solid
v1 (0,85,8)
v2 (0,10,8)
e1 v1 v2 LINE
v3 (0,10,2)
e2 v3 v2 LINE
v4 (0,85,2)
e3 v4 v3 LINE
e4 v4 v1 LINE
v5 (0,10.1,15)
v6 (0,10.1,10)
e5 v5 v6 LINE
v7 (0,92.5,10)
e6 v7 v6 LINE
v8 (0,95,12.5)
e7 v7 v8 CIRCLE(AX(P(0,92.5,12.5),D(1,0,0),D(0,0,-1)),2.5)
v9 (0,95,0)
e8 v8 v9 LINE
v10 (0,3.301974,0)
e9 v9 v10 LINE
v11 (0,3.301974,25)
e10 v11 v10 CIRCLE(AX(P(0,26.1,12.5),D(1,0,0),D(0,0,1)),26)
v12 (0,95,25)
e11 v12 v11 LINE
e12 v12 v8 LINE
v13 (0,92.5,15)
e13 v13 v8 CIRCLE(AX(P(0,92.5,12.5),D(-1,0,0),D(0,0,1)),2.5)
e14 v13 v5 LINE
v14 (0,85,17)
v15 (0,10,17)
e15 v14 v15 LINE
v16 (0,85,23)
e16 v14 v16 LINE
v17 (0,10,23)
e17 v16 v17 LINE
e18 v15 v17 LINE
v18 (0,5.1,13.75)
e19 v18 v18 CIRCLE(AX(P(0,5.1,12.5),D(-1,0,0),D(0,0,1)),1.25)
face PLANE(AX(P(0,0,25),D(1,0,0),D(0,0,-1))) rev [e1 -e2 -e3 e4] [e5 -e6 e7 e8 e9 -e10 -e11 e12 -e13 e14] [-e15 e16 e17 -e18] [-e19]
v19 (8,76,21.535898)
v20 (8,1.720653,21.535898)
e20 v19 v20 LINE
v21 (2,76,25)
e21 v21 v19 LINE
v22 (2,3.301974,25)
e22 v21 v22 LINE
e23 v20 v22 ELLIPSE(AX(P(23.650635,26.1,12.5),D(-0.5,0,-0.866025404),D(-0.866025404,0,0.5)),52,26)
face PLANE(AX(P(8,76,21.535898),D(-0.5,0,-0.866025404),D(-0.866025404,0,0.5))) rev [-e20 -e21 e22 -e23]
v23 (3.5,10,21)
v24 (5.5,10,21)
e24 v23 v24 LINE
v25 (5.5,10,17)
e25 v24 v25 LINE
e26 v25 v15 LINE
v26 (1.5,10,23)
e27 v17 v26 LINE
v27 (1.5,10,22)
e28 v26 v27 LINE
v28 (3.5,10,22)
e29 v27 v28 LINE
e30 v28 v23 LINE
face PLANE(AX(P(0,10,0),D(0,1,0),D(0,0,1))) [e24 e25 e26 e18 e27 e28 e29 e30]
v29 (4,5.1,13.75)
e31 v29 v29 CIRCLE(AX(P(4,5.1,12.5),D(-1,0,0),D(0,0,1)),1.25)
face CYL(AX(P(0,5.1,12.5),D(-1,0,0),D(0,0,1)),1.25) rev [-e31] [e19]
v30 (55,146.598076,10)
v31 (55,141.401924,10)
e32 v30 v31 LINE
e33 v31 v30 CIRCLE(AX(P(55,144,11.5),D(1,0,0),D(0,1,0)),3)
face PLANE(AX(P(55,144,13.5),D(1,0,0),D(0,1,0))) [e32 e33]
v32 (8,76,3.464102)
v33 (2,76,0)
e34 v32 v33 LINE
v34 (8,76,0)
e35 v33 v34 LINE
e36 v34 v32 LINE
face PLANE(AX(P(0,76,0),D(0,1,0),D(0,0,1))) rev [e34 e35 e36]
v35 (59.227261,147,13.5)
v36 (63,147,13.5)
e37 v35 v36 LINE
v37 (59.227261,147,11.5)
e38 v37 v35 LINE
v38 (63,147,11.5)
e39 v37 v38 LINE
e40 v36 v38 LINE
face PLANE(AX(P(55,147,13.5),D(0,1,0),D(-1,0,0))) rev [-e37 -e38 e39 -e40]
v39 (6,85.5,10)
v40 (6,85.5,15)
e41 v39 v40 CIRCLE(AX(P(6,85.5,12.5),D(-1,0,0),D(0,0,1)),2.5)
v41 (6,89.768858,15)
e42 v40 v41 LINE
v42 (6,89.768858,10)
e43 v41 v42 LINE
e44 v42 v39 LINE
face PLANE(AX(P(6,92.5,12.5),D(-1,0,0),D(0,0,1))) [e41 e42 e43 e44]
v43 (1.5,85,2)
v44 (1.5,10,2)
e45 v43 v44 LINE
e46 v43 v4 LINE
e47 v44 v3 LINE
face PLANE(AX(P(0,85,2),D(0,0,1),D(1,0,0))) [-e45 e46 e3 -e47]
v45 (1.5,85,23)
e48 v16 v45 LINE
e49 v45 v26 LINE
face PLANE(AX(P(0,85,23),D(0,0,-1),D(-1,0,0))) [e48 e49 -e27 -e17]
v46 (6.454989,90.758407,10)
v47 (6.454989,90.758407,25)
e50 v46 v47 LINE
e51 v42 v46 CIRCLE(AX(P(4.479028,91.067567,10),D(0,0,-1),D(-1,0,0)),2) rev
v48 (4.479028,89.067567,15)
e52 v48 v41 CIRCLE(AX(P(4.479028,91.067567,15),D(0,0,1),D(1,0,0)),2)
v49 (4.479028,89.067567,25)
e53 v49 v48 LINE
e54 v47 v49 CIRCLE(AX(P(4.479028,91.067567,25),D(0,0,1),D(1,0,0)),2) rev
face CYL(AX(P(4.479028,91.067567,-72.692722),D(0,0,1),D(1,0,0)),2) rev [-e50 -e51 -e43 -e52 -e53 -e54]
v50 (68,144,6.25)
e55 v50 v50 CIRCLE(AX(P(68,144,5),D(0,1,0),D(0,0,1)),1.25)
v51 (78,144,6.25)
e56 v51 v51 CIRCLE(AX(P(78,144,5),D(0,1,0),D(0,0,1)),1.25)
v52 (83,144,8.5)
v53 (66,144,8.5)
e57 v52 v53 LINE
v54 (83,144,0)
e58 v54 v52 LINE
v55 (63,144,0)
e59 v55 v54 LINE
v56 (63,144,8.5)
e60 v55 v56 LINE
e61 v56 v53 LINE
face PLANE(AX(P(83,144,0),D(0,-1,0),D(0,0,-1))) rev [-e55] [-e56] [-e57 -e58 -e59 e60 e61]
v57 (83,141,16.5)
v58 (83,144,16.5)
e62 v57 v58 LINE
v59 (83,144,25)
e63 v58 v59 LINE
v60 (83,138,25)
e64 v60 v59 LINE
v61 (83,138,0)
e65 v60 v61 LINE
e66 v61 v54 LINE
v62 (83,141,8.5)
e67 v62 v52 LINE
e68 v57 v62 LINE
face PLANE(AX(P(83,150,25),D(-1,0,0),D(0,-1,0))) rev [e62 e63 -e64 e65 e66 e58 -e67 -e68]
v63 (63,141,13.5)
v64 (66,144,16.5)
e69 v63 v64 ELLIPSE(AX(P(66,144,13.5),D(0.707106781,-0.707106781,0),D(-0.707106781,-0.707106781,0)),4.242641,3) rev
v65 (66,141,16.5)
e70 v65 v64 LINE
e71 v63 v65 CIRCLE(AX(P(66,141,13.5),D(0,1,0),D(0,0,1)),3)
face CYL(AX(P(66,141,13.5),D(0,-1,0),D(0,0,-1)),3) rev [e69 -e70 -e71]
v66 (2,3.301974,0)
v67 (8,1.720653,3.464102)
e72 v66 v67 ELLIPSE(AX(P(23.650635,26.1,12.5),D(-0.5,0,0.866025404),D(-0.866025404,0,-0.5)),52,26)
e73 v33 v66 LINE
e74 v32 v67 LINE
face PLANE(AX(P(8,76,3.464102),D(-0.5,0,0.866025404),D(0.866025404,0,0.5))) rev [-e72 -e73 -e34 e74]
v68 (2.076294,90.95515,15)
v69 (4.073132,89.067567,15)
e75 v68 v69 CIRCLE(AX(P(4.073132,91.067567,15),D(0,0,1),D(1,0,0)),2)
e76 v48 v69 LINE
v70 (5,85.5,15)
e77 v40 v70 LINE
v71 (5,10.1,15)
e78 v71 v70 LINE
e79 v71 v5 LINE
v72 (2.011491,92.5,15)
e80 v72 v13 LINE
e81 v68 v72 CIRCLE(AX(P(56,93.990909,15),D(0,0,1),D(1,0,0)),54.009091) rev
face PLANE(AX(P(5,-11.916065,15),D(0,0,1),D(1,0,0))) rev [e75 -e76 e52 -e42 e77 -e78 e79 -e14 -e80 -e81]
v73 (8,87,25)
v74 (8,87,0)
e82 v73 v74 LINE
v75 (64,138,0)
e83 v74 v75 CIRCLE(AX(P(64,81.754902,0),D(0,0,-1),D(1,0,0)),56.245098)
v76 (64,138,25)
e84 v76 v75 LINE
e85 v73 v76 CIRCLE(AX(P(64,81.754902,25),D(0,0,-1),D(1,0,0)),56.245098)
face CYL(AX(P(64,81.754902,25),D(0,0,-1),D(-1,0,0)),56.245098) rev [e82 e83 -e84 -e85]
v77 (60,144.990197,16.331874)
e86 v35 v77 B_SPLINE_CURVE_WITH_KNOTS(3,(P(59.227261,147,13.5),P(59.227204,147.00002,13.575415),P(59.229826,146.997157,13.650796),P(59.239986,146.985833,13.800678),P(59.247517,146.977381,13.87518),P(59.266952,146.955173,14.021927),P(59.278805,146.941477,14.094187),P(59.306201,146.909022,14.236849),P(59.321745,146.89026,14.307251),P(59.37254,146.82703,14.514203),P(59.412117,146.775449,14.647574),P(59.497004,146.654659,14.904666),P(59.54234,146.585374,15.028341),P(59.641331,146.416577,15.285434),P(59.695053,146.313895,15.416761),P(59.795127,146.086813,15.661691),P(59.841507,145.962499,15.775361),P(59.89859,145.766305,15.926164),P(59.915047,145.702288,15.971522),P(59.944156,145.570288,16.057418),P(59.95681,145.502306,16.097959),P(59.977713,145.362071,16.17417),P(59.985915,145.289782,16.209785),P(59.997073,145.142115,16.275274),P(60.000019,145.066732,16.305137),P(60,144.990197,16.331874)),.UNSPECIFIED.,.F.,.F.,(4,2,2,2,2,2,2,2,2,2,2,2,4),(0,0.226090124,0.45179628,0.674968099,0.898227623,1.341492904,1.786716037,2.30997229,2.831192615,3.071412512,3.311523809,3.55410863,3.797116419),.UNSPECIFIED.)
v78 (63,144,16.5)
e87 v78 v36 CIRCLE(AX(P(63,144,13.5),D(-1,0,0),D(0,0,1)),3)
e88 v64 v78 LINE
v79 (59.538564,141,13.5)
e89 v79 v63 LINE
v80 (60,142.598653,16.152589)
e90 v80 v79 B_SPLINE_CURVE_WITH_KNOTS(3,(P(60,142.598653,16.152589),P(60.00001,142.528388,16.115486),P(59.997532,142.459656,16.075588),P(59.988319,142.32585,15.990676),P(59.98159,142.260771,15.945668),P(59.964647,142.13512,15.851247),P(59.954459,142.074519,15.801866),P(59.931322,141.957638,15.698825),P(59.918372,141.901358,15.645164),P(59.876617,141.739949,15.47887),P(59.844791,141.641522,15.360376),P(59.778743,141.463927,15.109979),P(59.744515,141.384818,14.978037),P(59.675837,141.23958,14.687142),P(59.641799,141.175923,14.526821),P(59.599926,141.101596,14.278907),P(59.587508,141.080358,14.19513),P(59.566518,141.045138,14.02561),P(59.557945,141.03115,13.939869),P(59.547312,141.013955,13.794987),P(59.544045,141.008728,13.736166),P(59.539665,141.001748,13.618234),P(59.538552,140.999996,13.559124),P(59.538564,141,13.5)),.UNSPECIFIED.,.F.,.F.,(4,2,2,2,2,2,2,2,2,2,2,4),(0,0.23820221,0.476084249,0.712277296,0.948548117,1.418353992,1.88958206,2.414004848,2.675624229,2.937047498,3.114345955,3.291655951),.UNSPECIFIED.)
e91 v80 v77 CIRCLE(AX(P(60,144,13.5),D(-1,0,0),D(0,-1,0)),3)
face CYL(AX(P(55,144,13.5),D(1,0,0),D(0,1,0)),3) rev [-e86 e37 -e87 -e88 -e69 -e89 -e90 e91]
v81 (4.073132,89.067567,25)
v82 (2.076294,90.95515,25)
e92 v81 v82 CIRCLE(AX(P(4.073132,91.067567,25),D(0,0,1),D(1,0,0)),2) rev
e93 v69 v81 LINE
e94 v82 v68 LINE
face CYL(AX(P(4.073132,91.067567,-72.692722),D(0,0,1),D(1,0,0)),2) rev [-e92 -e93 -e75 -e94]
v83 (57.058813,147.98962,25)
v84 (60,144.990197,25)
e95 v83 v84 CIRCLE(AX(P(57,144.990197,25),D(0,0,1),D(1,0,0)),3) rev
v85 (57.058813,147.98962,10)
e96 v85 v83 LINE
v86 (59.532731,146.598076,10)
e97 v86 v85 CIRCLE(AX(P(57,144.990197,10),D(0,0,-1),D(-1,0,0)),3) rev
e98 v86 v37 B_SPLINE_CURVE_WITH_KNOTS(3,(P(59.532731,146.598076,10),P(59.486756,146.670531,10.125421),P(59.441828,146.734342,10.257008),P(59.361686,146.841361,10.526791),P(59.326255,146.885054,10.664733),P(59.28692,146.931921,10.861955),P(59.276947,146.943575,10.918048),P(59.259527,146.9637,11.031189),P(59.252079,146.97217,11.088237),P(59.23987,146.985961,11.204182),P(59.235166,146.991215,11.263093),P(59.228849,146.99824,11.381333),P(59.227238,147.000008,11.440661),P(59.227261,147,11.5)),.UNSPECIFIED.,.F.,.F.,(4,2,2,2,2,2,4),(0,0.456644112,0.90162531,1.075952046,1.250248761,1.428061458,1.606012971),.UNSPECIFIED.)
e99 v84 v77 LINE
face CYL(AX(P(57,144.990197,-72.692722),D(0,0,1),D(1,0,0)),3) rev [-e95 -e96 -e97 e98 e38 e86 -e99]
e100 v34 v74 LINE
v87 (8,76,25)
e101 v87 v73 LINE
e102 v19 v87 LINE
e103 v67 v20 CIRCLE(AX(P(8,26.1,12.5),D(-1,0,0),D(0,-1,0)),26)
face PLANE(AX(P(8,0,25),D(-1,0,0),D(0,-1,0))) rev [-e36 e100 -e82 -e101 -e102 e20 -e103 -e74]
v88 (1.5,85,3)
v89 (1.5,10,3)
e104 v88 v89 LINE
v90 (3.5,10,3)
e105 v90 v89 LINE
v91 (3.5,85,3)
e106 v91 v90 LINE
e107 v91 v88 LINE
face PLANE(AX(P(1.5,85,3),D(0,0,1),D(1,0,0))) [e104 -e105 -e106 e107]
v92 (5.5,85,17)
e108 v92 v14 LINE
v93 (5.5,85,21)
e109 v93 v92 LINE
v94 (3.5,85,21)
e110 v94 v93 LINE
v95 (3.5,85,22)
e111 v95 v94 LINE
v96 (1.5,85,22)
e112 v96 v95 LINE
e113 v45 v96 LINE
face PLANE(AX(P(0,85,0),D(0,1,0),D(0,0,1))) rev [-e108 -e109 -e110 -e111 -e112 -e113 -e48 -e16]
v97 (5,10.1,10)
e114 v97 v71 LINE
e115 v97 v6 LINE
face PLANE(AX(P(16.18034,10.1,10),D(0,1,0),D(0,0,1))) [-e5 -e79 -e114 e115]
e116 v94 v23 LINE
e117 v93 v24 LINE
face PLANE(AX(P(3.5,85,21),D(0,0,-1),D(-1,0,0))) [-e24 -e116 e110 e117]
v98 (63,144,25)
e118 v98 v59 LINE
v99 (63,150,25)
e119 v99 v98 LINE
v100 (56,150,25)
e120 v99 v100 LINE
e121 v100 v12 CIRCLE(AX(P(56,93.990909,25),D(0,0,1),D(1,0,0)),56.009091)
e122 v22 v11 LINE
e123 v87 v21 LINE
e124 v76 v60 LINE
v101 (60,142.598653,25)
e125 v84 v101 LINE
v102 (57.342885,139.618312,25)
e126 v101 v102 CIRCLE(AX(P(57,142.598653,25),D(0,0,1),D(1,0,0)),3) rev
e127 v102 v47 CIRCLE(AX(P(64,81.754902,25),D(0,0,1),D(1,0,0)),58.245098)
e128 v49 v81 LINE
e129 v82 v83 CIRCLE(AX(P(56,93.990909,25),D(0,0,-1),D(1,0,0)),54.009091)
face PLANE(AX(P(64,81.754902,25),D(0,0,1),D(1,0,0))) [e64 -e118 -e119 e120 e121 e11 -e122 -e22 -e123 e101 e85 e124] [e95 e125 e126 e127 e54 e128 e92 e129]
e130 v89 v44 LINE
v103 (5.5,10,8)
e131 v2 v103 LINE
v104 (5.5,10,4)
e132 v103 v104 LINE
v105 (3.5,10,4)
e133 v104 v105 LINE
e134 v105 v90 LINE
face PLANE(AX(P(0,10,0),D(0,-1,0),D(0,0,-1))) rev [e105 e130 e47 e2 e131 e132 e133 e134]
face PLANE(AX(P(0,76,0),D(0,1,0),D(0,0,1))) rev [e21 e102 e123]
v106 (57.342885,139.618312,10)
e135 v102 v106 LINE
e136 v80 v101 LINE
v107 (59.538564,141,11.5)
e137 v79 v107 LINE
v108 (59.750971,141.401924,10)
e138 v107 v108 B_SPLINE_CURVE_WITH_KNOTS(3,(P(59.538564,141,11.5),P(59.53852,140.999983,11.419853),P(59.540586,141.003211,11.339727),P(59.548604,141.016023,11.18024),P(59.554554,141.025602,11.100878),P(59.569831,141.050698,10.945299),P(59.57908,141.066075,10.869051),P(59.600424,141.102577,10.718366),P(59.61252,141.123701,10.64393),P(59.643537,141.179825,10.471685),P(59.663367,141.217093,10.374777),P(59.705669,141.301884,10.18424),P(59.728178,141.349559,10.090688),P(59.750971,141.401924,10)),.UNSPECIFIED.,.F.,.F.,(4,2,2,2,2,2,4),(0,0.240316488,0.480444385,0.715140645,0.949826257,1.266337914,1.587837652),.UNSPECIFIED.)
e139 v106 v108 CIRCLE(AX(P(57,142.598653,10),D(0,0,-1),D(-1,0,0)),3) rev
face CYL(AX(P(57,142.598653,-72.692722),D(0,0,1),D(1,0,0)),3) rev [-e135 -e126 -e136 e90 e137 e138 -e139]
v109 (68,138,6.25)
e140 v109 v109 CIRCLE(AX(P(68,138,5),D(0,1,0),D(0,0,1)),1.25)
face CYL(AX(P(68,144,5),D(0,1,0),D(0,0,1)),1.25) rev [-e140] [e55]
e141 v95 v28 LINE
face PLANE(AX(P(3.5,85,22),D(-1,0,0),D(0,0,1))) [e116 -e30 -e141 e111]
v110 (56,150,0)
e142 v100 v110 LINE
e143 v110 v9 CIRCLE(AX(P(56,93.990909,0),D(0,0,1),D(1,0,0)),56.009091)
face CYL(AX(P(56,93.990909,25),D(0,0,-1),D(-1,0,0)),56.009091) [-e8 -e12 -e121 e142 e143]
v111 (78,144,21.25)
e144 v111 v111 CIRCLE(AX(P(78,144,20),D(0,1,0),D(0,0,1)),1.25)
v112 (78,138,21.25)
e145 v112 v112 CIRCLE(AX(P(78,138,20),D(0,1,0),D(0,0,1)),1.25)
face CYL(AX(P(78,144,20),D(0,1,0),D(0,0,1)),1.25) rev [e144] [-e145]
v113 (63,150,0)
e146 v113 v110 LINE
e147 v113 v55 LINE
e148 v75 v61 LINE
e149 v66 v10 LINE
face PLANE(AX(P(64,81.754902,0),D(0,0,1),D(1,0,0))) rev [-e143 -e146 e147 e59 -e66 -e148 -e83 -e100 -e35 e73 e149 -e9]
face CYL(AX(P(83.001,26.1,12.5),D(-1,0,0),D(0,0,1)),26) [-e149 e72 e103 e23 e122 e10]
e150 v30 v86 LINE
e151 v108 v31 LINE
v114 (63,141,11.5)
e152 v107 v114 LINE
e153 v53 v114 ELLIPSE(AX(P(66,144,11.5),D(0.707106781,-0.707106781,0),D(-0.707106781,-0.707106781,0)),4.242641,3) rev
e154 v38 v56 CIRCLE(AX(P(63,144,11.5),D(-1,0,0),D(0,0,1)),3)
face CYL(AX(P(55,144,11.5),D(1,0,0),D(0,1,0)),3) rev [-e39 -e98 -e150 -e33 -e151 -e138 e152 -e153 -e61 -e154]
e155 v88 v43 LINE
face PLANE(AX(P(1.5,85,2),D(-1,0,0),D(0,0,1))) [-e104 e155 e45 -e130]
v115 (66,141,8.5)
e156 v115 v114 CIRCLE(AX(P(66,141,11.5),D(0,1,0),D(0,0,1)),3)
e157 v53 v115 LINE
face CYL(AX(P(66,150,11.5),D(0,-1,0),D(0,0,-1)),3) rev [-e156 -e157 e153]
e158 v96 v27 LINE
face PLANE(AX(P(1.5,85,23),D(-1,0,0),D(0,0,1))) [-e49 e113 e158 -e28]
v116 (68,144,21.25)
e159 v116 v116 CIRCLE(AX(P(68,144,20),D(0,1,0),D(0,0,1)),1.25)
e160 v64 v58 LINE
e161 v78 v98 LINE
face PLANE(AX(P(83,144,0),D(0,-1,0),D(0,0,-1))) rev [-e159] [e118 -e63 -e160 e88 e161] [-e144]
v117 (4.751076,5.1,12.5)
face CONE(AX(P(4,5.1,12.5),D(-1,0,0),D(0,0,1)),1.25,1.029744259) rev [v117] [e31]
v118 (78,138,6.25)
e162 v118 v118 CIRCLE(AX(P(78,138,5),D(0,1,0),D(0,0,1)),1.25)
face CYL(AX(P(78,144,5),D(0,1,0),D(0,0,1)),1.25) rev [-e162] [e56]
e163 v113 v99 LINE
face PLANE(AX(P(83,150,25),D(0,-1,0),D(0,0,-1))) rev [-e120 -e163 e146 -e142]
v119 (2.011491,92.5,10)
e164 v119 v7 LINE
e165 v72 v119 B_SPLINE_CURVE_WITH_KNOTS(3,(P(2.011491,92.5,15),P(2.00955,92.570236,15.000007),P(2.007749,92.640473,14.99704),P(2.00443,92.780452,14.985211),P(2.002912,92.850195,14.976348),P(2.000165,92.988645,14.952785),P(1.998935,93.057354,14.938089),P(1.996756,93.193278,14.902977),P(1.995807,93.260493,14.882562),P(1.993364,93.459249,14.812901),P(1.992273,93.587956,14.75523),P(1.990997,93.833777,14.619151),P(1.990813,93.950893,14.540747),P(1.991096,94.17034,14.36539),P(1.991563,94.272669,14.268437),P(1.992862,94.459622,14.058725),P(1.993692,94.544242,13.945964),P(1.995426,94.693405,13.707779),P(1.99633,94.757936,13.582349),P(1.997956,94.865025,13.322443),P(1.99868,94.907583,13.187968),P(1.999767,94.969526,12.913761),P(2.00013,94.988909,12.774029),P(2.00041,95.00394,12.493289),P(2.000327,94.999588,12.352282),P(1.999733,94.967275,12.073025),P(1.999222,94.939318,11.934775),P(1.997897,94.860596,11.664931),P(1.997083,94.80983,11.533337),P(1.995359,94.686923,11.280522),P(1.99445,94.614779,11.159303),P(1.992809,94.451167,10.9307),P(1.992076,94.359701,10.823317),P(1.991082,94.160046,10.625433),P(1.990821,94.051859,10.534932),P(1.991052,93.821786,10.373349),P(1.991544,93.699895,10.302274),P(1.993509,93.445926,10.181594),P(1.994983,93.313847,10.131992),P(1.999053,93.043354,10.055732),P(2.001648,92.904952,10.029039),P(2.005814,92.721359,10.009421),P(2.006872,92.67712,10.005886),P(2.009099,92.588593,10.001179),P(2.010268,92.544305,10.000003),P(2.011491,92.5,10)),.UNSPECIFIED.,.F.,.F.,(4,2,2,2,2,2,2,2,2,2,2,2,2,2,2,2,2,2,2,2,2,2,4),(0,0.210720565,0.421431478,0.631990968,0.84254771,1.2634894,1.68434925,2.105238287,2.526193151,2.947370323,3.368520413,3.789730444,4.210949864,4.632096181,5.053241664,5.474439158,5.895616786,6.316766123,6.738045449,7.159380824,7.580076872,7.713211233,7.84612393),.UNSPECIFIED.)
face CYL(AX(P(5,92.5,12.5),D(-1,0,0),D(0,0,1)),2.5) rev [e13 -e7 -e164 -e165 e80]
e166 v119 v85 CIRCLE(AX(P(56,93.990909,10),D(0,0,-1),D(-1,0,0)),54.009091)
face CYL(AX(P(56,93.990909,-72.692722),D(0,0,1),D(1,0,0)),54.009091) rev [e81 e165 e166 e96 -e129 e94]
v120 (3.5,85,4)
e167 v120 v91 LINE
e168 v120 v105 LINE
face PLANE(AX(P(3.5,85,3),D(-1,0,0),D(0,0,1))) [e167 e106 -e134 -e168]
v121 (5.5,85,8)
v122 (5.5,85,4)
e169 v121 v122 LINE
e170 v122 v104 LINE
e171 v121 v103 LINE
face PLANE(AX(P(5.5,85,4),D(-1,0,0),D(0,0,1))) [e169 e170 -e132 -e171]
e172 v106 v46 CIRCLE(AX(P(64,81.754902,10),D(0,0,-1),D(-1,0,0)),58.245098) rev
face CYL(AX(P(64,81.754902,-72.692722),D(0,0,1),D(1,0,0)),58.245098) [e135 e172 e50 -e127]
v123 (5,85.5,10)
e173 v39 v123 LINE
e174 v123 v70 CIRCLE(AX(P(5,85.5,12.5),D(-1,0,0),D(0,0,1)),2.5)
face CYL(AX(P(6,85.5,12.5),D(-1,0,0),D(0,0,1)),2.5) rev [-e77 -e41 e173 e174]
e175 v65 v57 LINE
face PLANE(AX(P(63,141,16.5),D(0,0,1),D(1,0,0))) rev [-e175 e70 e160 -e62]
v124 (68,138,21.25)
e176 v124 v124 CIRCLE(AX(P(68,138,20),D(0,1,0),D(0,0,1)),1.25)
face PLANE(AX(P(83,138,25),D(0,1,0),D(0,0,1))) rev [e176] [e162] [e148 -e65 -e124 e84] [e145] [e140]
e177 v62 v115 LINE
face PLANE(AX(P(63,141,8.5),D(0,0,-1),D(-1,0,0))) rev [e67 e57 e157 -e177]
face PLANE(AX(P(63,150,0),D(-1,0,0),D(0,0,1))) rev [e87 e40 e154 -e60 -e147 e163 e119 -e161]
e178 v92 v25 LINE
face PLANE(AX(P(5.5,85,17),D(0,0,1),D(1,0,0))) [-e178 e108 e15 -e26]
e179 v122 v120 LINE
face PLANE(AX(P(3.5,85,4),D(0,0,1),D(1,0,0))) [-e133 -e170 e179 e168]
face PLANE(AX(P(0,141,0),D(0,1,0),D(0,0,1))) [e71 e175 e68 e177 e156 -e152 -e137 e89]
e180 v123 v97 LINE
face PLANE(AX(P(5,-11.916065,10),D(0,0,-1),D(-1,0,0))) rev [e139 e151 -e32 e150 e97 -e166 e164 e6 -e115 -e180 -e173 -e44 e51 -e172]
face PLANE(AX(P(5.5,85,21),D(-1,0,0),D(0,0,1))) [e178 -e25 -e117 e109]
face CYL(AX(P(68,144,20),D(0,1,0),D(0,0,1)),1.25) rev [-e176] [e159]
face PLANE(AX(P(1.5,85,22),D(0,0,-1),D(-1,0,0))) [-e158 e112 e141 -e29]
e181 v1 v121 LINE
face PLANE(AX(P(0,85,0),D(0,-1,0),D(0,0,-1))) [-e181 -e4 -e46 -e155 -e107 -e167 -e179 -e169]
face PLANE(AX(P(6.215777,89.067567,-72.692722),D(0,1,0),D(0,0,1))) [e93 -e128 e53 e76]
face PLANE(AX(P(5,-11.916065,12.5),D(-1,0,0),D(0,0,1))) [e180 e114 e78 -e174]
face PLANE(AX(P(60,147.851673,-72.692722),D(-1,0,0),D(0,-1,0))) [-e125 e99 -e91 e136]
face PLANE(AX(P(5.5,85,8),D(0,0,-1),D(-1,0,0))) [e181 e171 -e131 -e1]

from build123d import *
from OCP.BRepAlgoAPI import BRepAlgoAPI_Cut
from OCP.TopTools import TopTools_ListOfShape

# Parameters (mm, degrees)
EXTRUDE_1_DEPTH      = 25
SKETCH_2_W           = 20
SKETCH_2_H           = 6
CUT_EXTRUDE_1_DEPTH  = 174.245490562
CUT_EXTRUDE_2_DEPTH  = 76
CUT_EXTRUDE_4_DEPTH  = 5
CUT_EXTRUDE_3_REACH  = 175.245
FILLET_3_R           = 2
FILLET_4_R           = 3
CUT_EXTRUDE_6_DEPTH  = 75
M3X0_51_D            = 2.5
CUT_EXTRUDE_7_REACH  = 175.245
SKETCH_13_W          = 20
SKETCH_13_H          = 8
CUT_EXTRUDE_8_DEPTH  = 3
FILLET_8_R           = 3
CUT_EXTRUDE_9_DEPTH  = 28
CUT_EXTRUDE_10_DEPTH = 6
EXTRUDE_2_DEPTH      = 5
M3X0_52_D            = 2.5
M3X0_52_DEPTH        = 4
M3X0_52_TIP          = 0.751075774


with BuildPart() as part:
    # Эскиз1 → Бобышка-Вытянуть1 (new body)
    with BuildSketch(Plane.XY):
        with BuildLine():
            Line((0, 0), (0, 95))
            ThreePointArc((0, 95), (16.753981094, 133.950491977), (56, 150))
            Line((56, 150), (83, 150))
            Line((83, 150), (83, 138))
            Line((83, 138), (64, 138))
            ThreePointArc((64, 138), (26.128506763, 123.339286692), (8, 87))
            Line((8, 87), (8, 0))
            Line((8, 0), (0, 0))
        make_face()
    extrude(amount=EXTRUDE_1_DEPTH)

    # Эскиз2 → Вырез-Вытянуть1 (cut, through all)
    with BuildSketch(Plane.XY.offset(25)):
        with Locations((73, 147)):
            Rectangle(SKETCH_2_W, SKETCH_2_H)
    extrude(amount=-CUT_EXTRUDE_1_DEPTH, mode=Mode.SUBTRACT)

    # Эскиз5 → Вырез-Вытянуть2 (cut)
    with BuildSketch(Plane.XZ):
        Polygon((8, 3.464101615), (2, 0), (8, 0), align=None)
        Polygon((8, 25), (8, 21.535898385), (2, 25), align=None)
    extrude(amount=-CUT_EXTRUDE_2_DEPTH, mode=Mode.SUBTRACT)

    # Эскиз6 → Вырез-Вытянуть4 (cut)
    with BuildSketch(Plane.ZY):
        with BuildLine():
            Line((10, -11.91606518), (10, 92.5))
            ThreePointArc((10, 92.5), (12.5, 95), (15, 92.5))
            Line((15, 92.5), (15, -11.91606518))
            ThreePointArc((15, -11.91606518), (12.5, -14.41606518), (10, -11.91606518))
        make_face()
    extrude(amount=-CUT_EXTRUDE_4_DEPTH, mode=Mode.SUBTRACT)

    # Вырез-Вытянуть3: up to this face of the body (flat: up to its plane)
    cut_extrude_3_end = Plane(part.part.faces().sort_by_distance((2.5, 46.25, 10))[0])
    # Эскиз3 → Вырез-Вытянуть3 (cut, up to the picked face)
    with BuildSketch(Plane(origin=(0, 0, 25), x_dir=(-1, 0, 0), z_dir=(0, 0, -1)), mode=Mode.PRIVATE) as cut_extrude_3_sk1:
        with BuildLine():
            Line((-60, 147.851673111), (-60, 139.862487056))
            ThreePointArc((-60, 139.862487056), (-24.008081752, 124.100361226), (-6.215777406, 89.067566648))
            Line((-6.215777406, 89.067566648), (-2.215777406, 89.067566648))
            ThreePointArc((-2.215777406, 89.067566648), (-17.483639866, 131.852128074), (-60, 147.851673111))
        make_face()
    cut_extrude_3_tool1 = split(extrude(cut_extrude_3_sk1.sketch, amount=CUT_EXTRUDE_3_REACH, mode=Mode.PRIVATE), bisect_by=cut_extrude_3_end, keep=Keep.BOTH, mode=Mode.PRIVATE)
    add(cut_extrude_3_tool1.solids().sort_by(Axis((26.403402, 126.933471, 25), (0, 0, -1)))[0], mode=Mode.SUBTRACT)

    # Скругление3
    fillet_3_edges = [part.edges().sort_by_distance(p)[0] for p in [
        (6.215777406, 89.067566648, 17.5),
        (2.215777406, 89.067566648, 20),
    ]]
    fillet(fillet_3_edges, radius=FILLET_3_R)

    # Скругление4
    fillet_4_edges = [part.edges().sort_by_distance(p)[0] for p in [
        (60, 139.862487056, 17.5),
        (60, 147.851673111, 17.5),
    ]]
    fillet(fillet_4_edges, radius=FILLET_4_R)

    # Эскиз8 → Вырез-Вытянуть6 (cut)
    with BuildSketch(Plane(origin=(0, 10, 0), x_dir=(1, 0, 0), z_dir=(0, 1, 0))):
        Polygon((0, -2), (1.5, -2), (1.5, -3), (3.5, -3), (3.5, -4), (5.5, -4), (5.5, -8), (0, -8), align=None)
        Polygon((3.5, -22), (3.5, -21), (5.5, -21), (5.5, -17), (0, -17), (0, -23), (1.5, -23), (1.5, -22), align=None)
    extrude(amount=CUT_EXTRUDE_6_DEPTH, mode=Mode.SUBTRACT)

    # Отверстие обработанное метчиком M3x0.51 (through all)
    with Locations(Plane(origin=(19.191951444, 144, 18.799685968), x_dir=(1, 0, 0), z_dir=(0, 1, 0))):
        with Locations((48.808048556, 13.799685968), (58.808048556, 13.799685968), (58.808048556, -1.200314032), (48.808048556, -1.200314032)):
            Hole(M3X0_51_D / 2)

    # Эскиз12 → Вырез-Вытянуть7 (cut, up to next)
    with BuildSketch(Plane.ZY, mode=Mode.PRIVATE) as cut_extrude_7_sk1:
        with BuildLine():
            Line((0, 3.30197377), (0, 0))
            Line((0, 0), (12.5, 0))
            Line((12.5, 0), (25, 0))
            Line((25, 0), (25, 3.30197377))
            ThreePointArc((25, 3.30197377), (12.5, 0.1), (0, 3.30197377))
        make_face()
    cut_extrude_7_tool1 = extrude(cut_extrude_7_sk1.sketch, amount=-CUT_EXTRUDE_7_REACH, mode=Mode.PRIVATE) & part.part
    add(cut_extrude_7_tool1.solids().sort_by_distance((0, 1.650987, 0.252171))[0], mode=Mode.SUBTRACT)

    # Эскиз13 → Вырез-Вытянуть8 (cut)
    with BuildSketch(Plane(origin=(0, 144, 0), x_dir=(1, 0, 0), z_dir=(0, 1, 0))):
        with Locations((73, -12.5)):
            Rectangle(SKETCH_13_W, SKETCH_13_H)
    extrude(amount=-CUT_EXTRUDE_8_DEPTH, mode=Mode.SUBTRACT)

    # Скругление8
    fillet_8_edges = [part.edges().sort_by_distance(p)[0] for p in [
        (63, 142.5, 16.5),
        (63, 142.5, 8.5),
    ]]
    fillet(fillet_8_edges, radius=FILLET_8_R)


with BuildPart() as cut_extrude_9_tool:
    # Эскиз14 → Вырез-Вытянуть9 (new body)
    with BuildSketch(Plane(origin=(83, 0, 0), x_dir=(0, 0, -1), z_dir=(1, 0, 0))):
        with BuildLine():
            Line((-13.5, 147), (-11.5, 147))
            ThreePointArc((-11.5, 147), (-8.5, 144), (-11.5, 141))
            Line((-11.5, 141), (-13.5, 141))
            ThreePointArc((-13.5, 141), (-16.5, 144), (-13.5, 147))
        make_face()
    extrude(amount=-CUT_EXTRUDE_9_DEPTH)


with BuildPart() as part_1:
    add(part.part)

    # Вырез-Вытянуть9: cut by cut_extrude_9_tool, with a tolerance
    cut_extrude_9_stock = TopTools_ListOfShape()
    cut_extrude_9_stock.Append(part_1.part.wrapped)
    cut_extrude_9_tools = TopTools_ListOfShape()
    cut_extrude_9_tools.Append(cut_extrude_9_tool.part.wrapped)
    cut_extrude_9_cut = BRepAlgoAPI_Cut()
    cut_extrude_9_cut.SetArguments(cut_extrude_9_stock)
    cut_extrude_9_cut.SetTools(cut_extrude_9_tools)
    cut_extrude_9_cut.SetFuzzyValue(0.00001)
    cut_extrude_9_cut.Build()
    add(Compound.cast(cut_extrude_9_cut.Shape()).solids(), mode=Mode.REPLACE)

    # Эскиз15 → Вырез-Вытянуть10 (cut)
    with BuildSketch(Plane.ZY):
        with BuildLine():
            Line((15, 92.5), (15, 85.5))
            ThreePointArc((15, 85.5), (12.5, 83), (10, 85.5))
            Line((10, 85.5), (10, 92.5))
            ThreePointArc((10, 92.5), (12.5, 95), (15, 92.5))
        make_face()
    extrude(amount=-CUT_EXTRUDE_10_DEPTH, mode=Mode.SUBTRACT)

    # Эскиз19 → Бобышка-Вытянуть2 (add)
    with BuildSketch(Plane.ZY):
        with BuildLine():
            Line((10, 10.1), (10, 0.220471411))
            ThreePointArc((10, 0.220471411), (12.5, 0.1), (15, 0.220471411))
            Line((15, 0.220471411), (15, 10.1))
            Line((15, 10.1), (10, 10.1))
        make_face()
    extrude(amount=-EXTRUDE_2_DEPTH)

    # Отверстие обработанное метчиком M3x0.52
    with Locations(Plane.ZY):
        with Locations((12.5, 5.1)):
            Hole(M3X0_52_D / 2, depth=M3X0_52_DEPTH)
            with Locations((0, 0, -(M3X0_52_DEPTH + M3X0_52_TIP / 2))):  # 118° drill point
                Cone(0, M3X0_52_D / 2, M3X0_52_TIP, mode=Mode.SUBTRACT)


solid = part_1.part
